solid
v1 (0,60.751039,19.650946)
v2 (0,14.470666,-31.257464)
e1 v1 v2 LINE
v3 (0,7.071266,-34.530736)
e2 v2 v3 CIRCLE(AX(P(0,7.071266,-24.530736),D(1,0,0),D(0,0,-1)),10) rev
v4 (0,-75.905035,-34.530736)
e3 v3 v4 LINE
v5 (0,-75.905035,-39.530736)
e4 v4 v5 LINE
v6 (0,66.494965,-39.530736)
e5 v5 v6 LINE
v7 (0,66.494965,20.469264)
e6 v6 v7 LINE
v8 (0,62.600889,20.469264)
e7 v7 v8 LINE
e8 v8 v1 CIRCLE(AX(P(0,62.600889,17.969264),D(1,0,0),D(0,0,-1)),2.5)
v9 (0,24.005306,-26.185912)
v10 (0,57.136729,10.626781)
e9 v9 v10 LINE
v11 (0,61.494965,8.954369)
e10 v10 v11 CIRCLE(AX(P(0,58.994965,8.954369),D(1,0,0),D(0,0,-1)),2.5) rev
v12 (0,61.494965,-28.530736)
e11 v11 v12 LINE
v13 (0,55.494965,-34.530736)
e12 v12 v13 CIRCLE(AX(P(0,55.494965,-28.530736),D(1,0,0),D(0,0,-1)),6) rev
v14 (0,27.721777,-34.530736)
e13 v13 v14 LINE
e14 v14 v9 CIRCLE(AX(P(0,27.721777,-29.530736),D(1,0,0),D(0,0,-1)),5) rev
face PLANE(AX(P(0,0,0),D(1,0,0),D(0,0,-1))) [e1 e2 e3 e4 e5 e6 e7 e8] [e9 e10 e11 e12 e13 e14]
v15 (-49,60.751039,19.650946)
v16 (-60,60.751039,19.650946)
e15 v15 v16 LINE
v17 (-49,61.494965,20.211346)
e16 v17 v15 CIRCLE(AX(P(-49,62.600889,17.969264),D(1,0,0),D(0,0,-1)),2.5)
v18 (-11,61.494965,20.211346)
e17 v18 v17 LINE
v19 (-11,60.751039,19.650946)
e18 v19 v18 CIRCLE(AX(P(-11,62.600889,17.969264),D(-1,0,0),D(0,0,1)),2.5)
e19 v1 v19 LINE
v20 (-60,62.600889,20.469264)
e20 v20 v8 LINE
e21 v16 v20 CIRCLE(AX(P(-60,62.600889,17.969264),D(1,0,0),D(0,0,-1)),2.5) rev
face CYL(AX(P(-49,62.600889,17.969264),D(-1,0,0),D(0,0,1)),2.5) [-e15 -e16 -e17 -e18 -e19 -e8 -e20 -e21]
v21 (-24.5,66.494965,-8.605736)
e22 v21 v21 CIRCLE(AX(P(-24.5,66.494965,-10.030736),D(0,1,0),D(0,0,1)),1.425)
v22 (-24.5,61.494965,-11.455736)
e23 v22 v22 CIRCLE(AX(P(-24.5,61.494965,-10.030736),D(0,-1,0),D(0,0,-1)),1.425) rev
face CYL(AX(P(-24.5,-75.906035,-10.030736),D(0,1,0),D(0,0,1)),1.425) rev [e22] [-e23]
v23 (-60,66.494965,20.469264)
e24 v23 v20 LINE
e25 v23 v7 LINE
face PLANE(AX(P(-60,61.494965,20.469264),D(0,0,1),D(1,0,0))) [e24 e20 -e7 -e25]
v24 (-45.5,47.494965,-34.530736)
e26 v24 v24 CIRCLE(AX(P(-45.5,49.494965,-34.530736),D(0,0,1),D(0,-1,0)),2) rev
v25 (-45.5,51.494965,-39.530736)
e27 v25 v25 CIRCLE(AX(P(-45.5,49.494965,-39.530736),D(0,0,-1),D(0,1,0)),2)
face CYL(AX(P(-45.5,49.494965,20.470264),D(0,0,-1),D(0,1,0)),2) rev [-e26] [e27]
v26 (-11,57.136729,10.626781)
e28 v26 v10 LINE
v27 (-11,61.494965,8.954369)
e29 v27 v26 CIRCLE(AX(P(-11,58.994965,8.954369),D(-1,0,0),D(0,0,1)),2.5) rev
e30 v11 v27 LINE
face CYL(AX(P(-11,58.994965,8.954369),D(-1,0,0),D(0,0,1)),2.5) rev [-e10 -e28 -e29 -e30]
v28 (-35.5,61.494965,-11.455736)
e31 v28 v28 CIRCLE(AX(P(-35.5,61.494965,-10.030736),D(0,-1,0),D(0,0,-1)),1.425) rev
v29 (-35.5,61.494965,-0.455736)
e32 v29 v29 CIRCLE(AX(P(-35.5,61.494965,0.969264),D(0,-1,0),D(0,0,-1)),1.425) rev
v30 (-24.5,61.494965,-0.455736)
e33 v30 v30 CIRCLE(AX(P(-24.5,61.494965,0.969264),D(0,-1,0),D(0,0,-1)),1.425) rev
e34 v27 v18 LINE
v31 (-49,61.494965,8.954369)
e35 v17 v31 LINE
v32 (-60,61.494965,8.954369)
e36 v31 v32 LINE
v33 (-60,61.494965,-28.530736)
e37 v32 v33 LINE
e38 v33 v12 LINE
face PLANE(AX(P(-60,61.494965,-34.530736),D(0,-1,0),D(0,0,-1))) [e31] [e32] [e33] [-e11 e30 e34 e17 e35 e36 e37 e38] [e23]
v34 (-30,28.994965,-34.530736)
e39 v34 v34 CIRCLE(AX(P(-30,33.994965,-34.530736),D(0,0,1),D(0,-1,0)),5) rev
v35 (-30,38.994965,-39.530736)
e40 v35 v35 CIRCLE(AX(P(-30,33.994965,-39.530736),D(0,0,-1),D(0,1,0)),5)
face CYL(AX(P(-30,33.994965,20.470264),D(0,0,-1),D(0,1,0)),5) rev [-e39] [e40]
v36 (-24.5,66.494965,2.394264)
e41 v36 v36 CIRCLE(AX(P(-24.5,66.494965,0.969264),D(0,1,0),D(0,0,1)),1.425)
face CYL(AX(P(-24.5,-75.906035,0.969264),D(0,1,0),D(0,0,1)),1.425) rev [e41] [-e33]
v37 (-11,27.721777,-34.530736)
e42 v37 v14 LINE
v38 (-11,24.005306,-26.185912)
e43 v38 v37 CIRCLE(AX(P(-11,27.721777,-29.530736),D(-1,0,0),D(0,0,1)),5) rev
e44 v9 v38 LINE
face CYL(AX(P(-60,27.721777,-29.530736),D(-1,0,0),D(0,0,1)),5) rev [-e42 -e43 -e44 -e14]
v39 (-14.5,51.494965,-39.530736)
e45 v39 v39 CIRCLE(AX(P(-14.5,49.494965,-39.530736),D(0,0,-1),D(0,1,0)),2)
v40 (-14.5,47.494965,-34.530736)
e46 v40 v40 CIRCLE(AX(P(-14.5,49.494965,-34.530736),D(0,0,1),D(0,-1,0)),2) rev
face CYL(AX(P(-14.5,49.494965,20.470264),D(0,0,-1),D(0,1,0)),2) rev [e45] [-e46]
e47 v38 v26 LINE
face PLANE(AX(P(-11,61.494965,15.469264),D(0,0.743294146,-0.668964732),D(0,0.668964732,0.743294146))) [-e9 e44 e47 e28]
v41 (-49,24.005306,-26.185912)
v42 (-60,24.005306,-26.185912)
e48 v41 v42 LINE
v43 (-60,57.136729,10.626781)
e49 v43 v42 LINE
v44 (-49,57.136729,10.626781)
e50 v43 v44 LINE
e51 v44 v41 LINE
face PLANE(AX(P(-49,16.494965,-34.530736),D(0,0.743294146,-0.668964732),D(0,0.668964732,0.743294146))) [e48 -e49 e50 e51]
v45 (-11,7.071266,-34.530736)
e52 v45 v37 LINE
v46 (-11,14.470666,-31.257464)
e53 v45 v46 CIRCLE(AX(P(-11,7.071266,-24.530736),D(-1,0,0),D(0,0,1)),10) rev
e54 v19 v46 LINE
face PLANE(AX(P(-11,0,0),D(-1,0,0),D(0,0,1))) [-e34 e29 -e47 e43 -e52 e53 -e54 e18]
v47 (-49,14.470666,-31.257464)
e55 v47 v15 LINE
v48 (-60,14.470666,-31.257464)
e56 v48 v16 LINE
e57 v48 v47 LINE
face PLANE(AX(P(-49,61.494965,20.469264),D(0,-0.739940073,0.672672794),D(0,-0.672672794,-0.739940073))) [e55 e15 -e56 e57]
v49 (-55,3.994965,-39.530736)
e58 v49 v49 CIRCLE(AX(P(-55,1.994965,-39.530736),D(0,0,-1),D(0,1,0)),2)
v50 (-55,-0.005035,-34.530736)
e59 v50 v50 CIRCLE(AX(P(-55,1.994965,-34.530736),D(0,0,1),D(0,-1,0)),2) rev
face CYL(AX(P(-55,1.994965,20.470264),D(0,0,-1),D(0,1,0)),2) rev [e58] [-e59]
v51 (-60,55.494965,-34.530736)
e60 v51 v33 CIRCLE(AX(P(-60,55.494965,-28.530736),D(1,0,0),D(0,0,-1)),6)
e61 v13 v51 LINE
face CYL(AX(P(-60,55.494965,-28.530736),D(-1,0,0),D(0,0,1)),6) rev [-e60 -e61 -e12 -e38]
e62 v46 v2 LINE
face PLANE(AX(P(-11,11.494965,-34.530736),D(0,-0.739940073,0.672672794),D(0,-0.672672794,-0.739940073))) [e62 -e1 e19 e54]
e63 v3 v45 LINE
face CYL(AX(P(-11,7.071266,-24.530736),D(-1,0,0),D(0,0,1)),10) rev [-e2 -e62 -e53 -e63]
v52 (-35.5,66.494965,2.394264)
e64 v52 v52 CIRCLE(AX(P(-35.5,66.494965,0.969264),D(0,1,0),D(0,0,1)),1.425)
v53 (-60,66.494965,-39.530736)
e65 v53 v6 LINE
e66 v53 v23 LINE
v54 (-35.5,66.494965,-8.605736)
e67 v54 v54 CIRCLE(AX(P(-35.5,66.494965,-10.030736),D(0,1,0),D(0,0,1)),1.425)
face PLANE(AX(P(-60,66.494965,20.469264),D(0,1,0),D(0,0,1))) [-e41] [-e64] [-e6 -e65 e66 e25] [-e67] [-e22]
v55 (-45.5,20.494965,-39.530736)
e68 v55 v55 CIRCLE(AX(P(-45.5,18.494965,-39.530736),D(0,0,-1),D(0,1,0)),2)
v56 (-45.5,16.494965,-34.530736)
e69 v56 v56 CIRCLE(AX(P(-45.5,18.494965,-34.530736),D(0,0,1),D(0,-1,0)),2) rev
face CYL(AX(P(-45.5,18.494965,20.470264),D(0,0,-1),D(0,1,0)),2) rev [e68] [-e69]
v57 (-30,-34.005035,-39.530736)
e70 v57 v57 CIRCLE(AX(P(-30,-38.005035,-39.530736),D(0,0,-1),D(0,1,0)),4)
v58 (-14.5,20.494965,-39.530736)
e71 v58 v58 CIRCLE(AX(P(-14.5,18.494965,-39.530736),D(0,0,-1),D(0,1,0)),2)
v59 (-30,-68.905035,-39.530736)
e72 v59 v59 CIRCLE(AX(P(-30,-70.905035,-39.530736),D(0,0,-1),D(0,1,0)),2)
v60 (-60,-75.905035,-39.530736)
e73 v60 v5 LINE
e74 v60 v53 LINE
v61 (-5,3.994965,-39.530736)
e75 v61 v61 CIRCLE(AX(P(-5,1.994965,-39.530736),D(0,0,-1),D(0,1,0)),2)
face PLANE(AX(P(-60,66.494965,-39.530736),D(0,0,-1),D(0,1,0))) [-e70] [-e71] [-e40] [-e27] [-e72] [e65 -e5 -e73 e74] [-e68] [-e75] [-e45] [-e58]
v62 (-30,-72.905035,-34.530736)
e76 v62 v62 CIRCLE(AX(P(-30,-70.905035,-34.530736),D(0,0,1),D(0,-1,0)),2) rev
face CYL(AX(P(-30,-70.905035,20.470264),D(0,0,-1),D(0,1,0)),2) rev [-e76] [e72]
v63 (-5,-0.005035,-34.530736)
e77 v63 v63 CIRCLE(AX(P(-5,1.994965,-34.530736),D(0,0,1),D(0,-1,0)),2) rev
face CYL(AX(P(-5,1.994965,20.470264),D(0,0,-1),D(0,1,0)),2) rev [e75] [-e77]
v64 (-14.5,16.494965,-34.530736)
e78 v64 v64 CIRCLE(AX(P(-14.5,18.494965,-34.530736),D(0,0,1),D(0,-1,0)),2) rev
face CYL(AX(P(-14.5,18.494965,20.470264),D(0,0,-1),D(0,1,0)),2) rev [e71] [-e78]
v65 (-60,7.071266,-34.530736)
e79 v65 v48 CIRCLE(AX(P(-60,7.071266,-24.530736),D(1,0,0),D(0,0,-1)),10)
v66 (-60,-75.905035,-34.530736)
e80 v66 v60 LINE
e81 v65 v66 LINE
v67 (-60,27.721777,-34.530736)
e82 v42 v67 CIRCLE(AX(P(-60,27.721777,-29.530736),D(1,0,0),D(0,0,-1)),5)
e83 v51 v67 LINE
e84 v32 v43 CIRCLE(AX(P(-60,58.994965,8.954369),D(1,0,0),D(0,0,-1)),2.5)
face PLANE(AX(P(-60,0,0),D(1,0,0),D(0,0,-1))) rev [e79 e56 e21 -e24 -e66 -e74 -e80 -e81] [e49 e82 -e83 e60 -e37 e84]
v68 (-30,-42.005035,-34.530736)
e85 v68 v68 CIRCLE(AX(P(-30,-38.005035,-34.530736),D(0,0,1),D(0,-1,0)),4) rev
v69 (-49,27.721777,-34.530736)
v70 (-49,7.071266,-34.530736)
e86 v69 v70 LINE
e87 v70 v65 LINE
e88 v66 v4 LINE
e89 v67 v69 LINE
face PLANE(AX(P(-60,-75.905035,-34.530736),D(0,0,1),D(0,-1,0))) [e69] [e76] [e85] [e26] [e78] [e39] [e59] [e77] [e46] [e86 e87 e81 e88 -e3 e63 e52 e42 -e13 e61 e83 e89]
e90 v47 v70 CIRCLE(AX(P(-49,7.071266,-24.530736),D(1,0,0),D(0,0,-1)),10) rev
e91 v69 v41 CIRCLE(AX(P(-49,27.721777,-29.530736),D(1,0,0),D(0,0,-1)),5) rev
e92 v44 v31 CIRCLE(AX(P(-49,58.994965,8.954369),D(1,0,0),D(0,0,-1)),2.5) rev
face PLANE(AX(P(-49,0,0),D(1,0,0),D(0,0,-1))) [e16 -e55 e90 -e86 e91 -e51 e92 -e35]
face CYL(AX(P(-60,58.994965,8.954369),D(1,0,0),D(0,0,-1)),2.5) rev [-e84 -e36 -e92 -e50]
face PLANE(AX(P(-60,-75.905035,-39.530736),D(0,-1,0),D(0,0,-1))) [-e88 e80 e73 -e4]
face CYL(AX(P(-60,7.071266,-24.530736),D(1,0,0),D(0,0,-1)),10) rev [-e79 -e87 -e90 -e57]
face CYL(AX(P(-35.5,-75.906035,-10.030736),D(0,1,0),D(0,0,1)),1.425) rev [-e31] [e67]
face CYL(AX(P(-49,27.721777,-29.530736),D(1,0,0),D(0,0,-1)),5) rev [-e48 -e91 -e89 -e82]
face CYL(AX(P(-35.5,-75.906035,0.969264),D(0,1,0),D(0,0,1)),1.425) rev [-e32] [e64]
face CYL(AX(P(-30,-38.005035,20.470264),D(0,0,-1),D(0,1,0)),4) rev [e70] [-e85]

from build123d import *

# Parameters (mm, degrees)
BOSS_EXTRUDE1_DEPTH = 60
CUT_EXTRUDE2_REACH  = 161.501
SKETCH2_R           = 1.425
CUT_EXTRUDE3_REACH  = 115.849
SKETCH10_R          = 5
SKETCH10_R_2        = 4
SKETCH10_R_3        = 2
BOSS_EXTRUDE2_DEPTH = 11
BOSS_EXTRUDE3_DEPTH = 11
FILLET2_R           = 10
FILLET3_R           = 10
FILLET4_R           = 5
FILLET5_R           = 5
FILLET6_R           = 2.5
FILLET7_R           = 2.5
FILLET8_START       = -61
FILLET8_DEPTH       = 62
FILLET9_R           = 6


with BuildPart() as part:
    # Sketch1 → Boss-Extrude1 (new body)
    with BuildSketch(Plane(origin=(0, 0, 0), x_dir=(0, 0, -1), z_dir=(1, 0, 0))):
        Polygon((-20.469264339, 61.494964584), (-20.469264339, 66.494964584), (39.530735661, 66.494964584), (39.530735661, -75.905035416), (34.530735661, -75.905035416), (34.530735661, 61.494964584), align=None)
    extrude(amount=-BOSS_EXTRUDE1_DEPTH)

    # Sketch2 → Cut-Extrude2 (cut, up to next)
    with BuildSketch(Plane(origin=(0, 66.494964584, 0), x_dir=(1, 0, 0), z_dir=(0, 1, 0)), mode=Mode.PRIVATE) as cut_extrude2_sk1:
        with Locations(Location((-35.5, 10.030735661, 0), (0, 0, 270))):
            Circle(SKETCH2_R)
    cut_extrude2_tool1 = extrude(cut_extrude2_sk1.sketch, amount=-CUT_EXTRUDE2_REACH, mode=Mode.PRIVATE) & part.part
    # Sketch2 → Cut-Extrude2 (cut, up to next)
    with BuildSketch(Plane(origin=(0, 66.494964584, 0), x_dir=(1, 0, 0), z_dir=(0, 1, 0)), mode=Mode.PRIVATE) as cut_extrude2_sk2:
        with Locations(Location((-24.5, 10.030735661, 0), (0, 0, 270))):
            Circle(SKETCH2_R)
    cut_extrude2_tool2 = extrude(cut_extrude2_sk2.sketch, amount=-CUT_EXTRUDE2_REACH, mode=Mode.PRIVATE) & part.part
    # Sketch2 → Cut-Extrude2 (cut, up to next)
    with BuildSketch(Plane(origin=(0, 66.494964584, 0), x_dir=(1, 0, 0), z_dir=(0, 1, 0)), mode=Mode.PRIVATE) as cut_extrude2_sk3:
        with Locations(Location((-24.5, -0.969264339, 0), (0, 0, 270))):
            Circle(SKETCH2_R)
    cut_extrude2_tool3 = extrude(cut_extrude2_sk3.sketch, amount=-CUT_EXTRUDE2_REACH, mode=Mode.PRIVATE) & part.part
    # Sketch2 → Cut-Extrude2 (cut, up to next)
    with BuildSketch(Plane(origin=(0, 66.494964584, 0), x_dir=(1, 0, 0), z_dir=(0, 1, 0)), mode=Mode.PRIVATE) as cut_extrude2_sk4:
        with Locations(Location((-35.5, -0.969264339, 0), (0, 0, 270))):
            Circle(SKETCH2_R)
    cut_extrude2_tool4 = extrude(cut_extrude2_sk4.sketch, amount=-CUT_EXTRUDE2_REACH, mode=Mode.PRIVATE) & part.part
    add(cut_extrude2_tool1.solids().sort_by_distance((-35.5, 66.494965, -10.030736))[0], mode=Mode.SUBTRACT)
    add(cut_extrude2_tool2.solids().sort_by_distance((-24.5, 66.494965, -10.030736))[0], mode=Mode.SUBTRACT)
    add(cut_extrude2_tool3.solids().sort_by_distance((-24.5, 66.494965, 0.969264))[0], mode=Mode.SUBTRACT)
    add(cut_extrude2_tool4.solids().sort_by_distance((-35.5, 66.494965, 0.969264))[0], mode=Mode.SUBTRACT)

    # Sketch10 → Cut-Extrude3 (cut, up to next)
    with BuildSketch(Plane(origin=(0, 0, -39.530735661), x_dir=(-1, 0, 0), z_dir=(0, 0, -1)), mode=Mode.PRIVATE) as cut_extrude3_sk1:
        with Locations(Location((30, 33.994964584, 0), (0, 0, 90))):
            Circle(SKETCH10_R)
    cut_extrude3_tool1 = extrude(cut_extrude3_sk1.sketch, amount=-CUT_EXTRUDE3_REACH, mode=Mode.PRIVATE) & part.part
    # Sketch10 → Cut-Extrude3 (cut, up to next)
    with BuildSketch(Plane(origin=(0, 0, -39.530735661), x_dir=(-1, 0, 0), z_dir=(0, 0, -1)), mode=Mode.PRIVATE) as cut_extrude3_sk2:
        with Locations(Location((30, -38.005035416, 0), (0, 0, 90))):
            Circle(SKETCH10_R_2)
    cut_extrude3_tool2 = extrude(cut_extrude3_sk2.sketch, amount=-CUT_EXTRUDE3_REACH, mode=Mode.PRIVATE) & part.part
    # Sketch10 → Cut-Extrude3 (cut, up to next)
    with BuildSketch(Plane(origin=(0, 0, -39.530735661), x_dir=(-1, 0, 0), z_dir=(0, 0, -1)), mode=Mode.PRIVATE) as cut_extrude3_sk3:
        with Locations(Location((14.5, 49.494964584, 0), (0, 0, 90))):
            Circle(SKETCH10_R_3)
    cut_extrude3_tool3 = extrude(cut_extrude3_sk3.sketch, amount=-CUT_EXTRUDE3_REACH, mode=Mode.PRIVATE) & part.part
    # Sketch10 → Cut-Extrude3 (cut, up to next)
    with BuildSketch(Plane(origin=(0, 0, -39.530735661), x_dir=(-1, 0, 0), z_dir=(0, 0, -1)), mode=Mode.PRIVATE) as cut_extrude3_sk4:
        with Locations(Location((14.5, 18.494964584, 0), (0, 0, 90))):
            Circle(SKETCH10_R_3)
    cut_extrude3_tool4 = extrude(cut_extrude3_sk4.sketch, amount=-CUT_EXTRUDE3_REACH, mode=Mode.PRIVATE) & part.part
    # Sketch10 → Cut-Extrude3 (cut, up to next)
    with BuildSketch(Plane(origin=(0, 0, -39.530735661), x_dir=(-1, 0, 0), z_dir=(0, 0, -1)), mode=Mode.PRIVATE) as cut_extrude3_sk5:
        with Locations(Location((45.5, 18.494964584, 0), (0, 0, 90))):
            Circle(SKETCH10_R_3)
    cut_extrude3_tool5 = extrude(cut_extrude3_sk5.sketch, amount=-CUT_EXTRUDE3_REACH, mode=Mode.PRIVATE) & part.part
    # Sketch10 → Cut-Extrude3 (cut, up to next)
    with BuildSketch(Plane(origin=(0, 0, -39.530735661), x_dir=(-1, 0, 0), z_dir=(0, 0, -1)), mode=Mode.PRIVATE) as cut_extrude3_sk6:
        with Locations(Location((45.5, 49.494964584, 0), (0, 0, 90))):
            Circle(SKETCH10_R_3)
    cut_extrude3_tool6 = extrude(cut_extrude3_sk6.sketch, amount=-CUT_EXTRUDE3_REACH, mode=Mode.PRIVATE) & part.part
    # Sketch10 → Cut-Extrude3 (cut, up to next)
    with BuildSketch(Plane(origin=(0, 0, -39.530735661), x_dir=(-1, 0, 0), z_dir=(0, 0, -1)), mode=Mode.PRIVATE) as cut_extrude3_sk7:
        with Locations(Location((5, 1.994964584, 0), (0, 0, 90))):
            Circle(SKETCH10_R_3)
    cut_extrude3_tool7 = extrude(cut_extrude3_sk7.sketch, amount=-CUT_EXTRUDE3_REACH, mode=Mode.PRIVATE) & part.part
    # Sketch10 → Cut-Extrude3 (cut, up to next)
    with BuildSketch(Plane(origin=(0, 0, -39.530735661), x_dir=(-1, 0, 0), z_dir=(0, 0, -1)), mode=Mode.PRIVATE) as cut_extrude3_sk8:
        with Locations(Location((55, 1.994964584, 0), (0, 0, 90))):
            Circle(SKETCH10_R_3)
    cut_extrude3_tool8 = extrude(cut_extrude3_sk8.sketch, amount=-CUT_EXTRUDE3_REACH, mode=Mode.PRIVATE) & part.part
    # Sketch10 → Cut-Extrude3 (cut, up to next)
    with BuildSketch(Plane(origin=(0, 0, -39.530735661), x_dir=(-1, 0, 0), z_dir=(0, 0, -1)), mode=Mode.PRIVATE) as cut_extrude3_sk9:
        with Locations(Location((30, -70.905035416, 0), (0, 0, 90))):
            Circle(SKETCH10_R_3)
    cut_extrude3_tool9 = extrude(cut_extrude3_sk9.sketch, amount=-CUT_EXTRUDE3_REACH, mode=Mode.PRIVATE) & part.part
    add(cut_extrude3_tool1.solids().sort_by_distance((-30, 33.994965, -39.530736))[0], mode=Mode.SUBTRACT)
    add(cut_extrude3_tool2.solids().sort_by_distance((-30, -38.005035, -39.530736))[0], mode=Mode.SUBTRACT)
    add(cut_extrude3_tool3.solids().sort_by_distance((-14.5, 49.494965, -39.530736))[0], mode=Mode.SUBTRACT)
    add(cut_extrude3_tool4.solids().sort_by_distance((-14.5, 18.494965, -39.530736))[0], mode=Mode.SUBTRACT)
    add(cut_extrude3_tool5.solids().sort_by_distance((-45.5, 18.494965, -39.530736))[0], mode=Mode.SUBTRACT)
    add(cut_extrude3_tool6.solids().sort_by_distance((-45.5, 49.494965, -39.530736))[0], mode=Mode.SUBTRACT)
    add(cut_extrude3_tool7.solids().sort_by_distance((-5, 1.994965, -39.530736))[0], mode=Mode.SUBTRACT)
    add(cut_extrude3_tool8.solids().sort_by_distance((-55, 1.994965, -39.530736))[0], mode=Mode.SUBTRACT)
    add(cut_extrude3_tool9.solids().sort_by_distance((-30, -70.905035, -39.530736))[0], mode=Mode.SUBTRACT)

    # Sketch11 → Boss-Extrude2 (add)
    with BuildSketch(Plane(origin=(0, 0, 0), x_dir=(0, 0, -1), z_dir=(1, 0, 0))):
        Polygon((-15.469264339, 61.494964584), (34.530735661, 16.494964584), (34.530735661, 11.494964584), (-20.469264339, 61.494964584), align=None)
    extrude(amount=-BOSS_EXTRUDE2_DEPTH)

    # Sketch13 → Boss-Extrude3 (add)
    with BuildSketch(Plane.ZY.offset(60)):
        Polygon((-34.530735661, 11.494964584), (-34.530735661, 16.494964584), (15.469264339, 61.494964584), (20.469264339, 61.494964584), align=None)
    extrude(amount=-BOSS_EXTRUDE3_DEPTH)

    # Fillet2
    fillet2_edges = [part.edges().sort_by_distance(p)[0] for p in [
        (-54.5, 11.494964584, -34.530735661),
    ]]
    fillet(fillet2_edges, radius=FILLET2_R)

    # Fillet3
    fillet3_edges = [part.edges().sort_by_distance(p)[0] for p in [
        (-5.5, 11.494964584, -34.530735661),
    ]]
    fillet(fillet3_edges, radius=FILLET3_R)

    # Fillet4
    fillet4_edges = [part.edges().sort_by_distance(p)[0] for p in [
        (-5.5, 16.494964584, -34.530735661),
    ]]
    fillet(fillet4_edges, radius=FILLET4_R)

    # Fillet5
    fillet5_edges = [part.edges().sort_by_distance(p)[0] for p in [
        (-54.5, 16.494964584, -34.530735661),
    ]]
    fillet(fillet5_edges, radius=FILLET5_R)

    # Fillet6
    fillet6_edges = [part.edges().sort_by_distance(p)[0] for p in [
        (-54.5, 61.494964584, 15.469264339),
    ]]
    fillet(fillet6_edges, radius=FILLET6_R)

    # Fillet7
    fillet7_edges = [part.edges().sort_by_distance(p)[0] for p in [
        (-5.5, 61.494964584, 15.469264339),
    ]]
    fillet(fillet7_edges, radius=FILLET7_R)

    # Fillet8: read off the stored shape, not the designer's step
    # Fillet8 outline → Fillet8 (cut)
    with BuildSketch(Plane.YZ.offset(FILLET8_START)):
        with BuildLine():
            Line((61.494964584, 20.469264339), (60.751039115, 19.650946324))
            ThreePointArc((60.751039115, 19.650946324), (61.589505337, 20.255550078), (62.600889299, 20.469264339))
            Line((62.600889299, 20.469264339), (61.494964584, 20.469264339))
        make_face()
    extrude(amount=FILLET8_DEPTH, mode=Mode.SUBTRACT)

    # Fillet9
    fillet9_edges = [part.edges().sort_by_distance(p)[0] for p in [
        (-30, 61.494964584, -34.530735661),
    ]]
    fillet(fillet9_edges, radius=FILLET9_R)


solid = part.part
